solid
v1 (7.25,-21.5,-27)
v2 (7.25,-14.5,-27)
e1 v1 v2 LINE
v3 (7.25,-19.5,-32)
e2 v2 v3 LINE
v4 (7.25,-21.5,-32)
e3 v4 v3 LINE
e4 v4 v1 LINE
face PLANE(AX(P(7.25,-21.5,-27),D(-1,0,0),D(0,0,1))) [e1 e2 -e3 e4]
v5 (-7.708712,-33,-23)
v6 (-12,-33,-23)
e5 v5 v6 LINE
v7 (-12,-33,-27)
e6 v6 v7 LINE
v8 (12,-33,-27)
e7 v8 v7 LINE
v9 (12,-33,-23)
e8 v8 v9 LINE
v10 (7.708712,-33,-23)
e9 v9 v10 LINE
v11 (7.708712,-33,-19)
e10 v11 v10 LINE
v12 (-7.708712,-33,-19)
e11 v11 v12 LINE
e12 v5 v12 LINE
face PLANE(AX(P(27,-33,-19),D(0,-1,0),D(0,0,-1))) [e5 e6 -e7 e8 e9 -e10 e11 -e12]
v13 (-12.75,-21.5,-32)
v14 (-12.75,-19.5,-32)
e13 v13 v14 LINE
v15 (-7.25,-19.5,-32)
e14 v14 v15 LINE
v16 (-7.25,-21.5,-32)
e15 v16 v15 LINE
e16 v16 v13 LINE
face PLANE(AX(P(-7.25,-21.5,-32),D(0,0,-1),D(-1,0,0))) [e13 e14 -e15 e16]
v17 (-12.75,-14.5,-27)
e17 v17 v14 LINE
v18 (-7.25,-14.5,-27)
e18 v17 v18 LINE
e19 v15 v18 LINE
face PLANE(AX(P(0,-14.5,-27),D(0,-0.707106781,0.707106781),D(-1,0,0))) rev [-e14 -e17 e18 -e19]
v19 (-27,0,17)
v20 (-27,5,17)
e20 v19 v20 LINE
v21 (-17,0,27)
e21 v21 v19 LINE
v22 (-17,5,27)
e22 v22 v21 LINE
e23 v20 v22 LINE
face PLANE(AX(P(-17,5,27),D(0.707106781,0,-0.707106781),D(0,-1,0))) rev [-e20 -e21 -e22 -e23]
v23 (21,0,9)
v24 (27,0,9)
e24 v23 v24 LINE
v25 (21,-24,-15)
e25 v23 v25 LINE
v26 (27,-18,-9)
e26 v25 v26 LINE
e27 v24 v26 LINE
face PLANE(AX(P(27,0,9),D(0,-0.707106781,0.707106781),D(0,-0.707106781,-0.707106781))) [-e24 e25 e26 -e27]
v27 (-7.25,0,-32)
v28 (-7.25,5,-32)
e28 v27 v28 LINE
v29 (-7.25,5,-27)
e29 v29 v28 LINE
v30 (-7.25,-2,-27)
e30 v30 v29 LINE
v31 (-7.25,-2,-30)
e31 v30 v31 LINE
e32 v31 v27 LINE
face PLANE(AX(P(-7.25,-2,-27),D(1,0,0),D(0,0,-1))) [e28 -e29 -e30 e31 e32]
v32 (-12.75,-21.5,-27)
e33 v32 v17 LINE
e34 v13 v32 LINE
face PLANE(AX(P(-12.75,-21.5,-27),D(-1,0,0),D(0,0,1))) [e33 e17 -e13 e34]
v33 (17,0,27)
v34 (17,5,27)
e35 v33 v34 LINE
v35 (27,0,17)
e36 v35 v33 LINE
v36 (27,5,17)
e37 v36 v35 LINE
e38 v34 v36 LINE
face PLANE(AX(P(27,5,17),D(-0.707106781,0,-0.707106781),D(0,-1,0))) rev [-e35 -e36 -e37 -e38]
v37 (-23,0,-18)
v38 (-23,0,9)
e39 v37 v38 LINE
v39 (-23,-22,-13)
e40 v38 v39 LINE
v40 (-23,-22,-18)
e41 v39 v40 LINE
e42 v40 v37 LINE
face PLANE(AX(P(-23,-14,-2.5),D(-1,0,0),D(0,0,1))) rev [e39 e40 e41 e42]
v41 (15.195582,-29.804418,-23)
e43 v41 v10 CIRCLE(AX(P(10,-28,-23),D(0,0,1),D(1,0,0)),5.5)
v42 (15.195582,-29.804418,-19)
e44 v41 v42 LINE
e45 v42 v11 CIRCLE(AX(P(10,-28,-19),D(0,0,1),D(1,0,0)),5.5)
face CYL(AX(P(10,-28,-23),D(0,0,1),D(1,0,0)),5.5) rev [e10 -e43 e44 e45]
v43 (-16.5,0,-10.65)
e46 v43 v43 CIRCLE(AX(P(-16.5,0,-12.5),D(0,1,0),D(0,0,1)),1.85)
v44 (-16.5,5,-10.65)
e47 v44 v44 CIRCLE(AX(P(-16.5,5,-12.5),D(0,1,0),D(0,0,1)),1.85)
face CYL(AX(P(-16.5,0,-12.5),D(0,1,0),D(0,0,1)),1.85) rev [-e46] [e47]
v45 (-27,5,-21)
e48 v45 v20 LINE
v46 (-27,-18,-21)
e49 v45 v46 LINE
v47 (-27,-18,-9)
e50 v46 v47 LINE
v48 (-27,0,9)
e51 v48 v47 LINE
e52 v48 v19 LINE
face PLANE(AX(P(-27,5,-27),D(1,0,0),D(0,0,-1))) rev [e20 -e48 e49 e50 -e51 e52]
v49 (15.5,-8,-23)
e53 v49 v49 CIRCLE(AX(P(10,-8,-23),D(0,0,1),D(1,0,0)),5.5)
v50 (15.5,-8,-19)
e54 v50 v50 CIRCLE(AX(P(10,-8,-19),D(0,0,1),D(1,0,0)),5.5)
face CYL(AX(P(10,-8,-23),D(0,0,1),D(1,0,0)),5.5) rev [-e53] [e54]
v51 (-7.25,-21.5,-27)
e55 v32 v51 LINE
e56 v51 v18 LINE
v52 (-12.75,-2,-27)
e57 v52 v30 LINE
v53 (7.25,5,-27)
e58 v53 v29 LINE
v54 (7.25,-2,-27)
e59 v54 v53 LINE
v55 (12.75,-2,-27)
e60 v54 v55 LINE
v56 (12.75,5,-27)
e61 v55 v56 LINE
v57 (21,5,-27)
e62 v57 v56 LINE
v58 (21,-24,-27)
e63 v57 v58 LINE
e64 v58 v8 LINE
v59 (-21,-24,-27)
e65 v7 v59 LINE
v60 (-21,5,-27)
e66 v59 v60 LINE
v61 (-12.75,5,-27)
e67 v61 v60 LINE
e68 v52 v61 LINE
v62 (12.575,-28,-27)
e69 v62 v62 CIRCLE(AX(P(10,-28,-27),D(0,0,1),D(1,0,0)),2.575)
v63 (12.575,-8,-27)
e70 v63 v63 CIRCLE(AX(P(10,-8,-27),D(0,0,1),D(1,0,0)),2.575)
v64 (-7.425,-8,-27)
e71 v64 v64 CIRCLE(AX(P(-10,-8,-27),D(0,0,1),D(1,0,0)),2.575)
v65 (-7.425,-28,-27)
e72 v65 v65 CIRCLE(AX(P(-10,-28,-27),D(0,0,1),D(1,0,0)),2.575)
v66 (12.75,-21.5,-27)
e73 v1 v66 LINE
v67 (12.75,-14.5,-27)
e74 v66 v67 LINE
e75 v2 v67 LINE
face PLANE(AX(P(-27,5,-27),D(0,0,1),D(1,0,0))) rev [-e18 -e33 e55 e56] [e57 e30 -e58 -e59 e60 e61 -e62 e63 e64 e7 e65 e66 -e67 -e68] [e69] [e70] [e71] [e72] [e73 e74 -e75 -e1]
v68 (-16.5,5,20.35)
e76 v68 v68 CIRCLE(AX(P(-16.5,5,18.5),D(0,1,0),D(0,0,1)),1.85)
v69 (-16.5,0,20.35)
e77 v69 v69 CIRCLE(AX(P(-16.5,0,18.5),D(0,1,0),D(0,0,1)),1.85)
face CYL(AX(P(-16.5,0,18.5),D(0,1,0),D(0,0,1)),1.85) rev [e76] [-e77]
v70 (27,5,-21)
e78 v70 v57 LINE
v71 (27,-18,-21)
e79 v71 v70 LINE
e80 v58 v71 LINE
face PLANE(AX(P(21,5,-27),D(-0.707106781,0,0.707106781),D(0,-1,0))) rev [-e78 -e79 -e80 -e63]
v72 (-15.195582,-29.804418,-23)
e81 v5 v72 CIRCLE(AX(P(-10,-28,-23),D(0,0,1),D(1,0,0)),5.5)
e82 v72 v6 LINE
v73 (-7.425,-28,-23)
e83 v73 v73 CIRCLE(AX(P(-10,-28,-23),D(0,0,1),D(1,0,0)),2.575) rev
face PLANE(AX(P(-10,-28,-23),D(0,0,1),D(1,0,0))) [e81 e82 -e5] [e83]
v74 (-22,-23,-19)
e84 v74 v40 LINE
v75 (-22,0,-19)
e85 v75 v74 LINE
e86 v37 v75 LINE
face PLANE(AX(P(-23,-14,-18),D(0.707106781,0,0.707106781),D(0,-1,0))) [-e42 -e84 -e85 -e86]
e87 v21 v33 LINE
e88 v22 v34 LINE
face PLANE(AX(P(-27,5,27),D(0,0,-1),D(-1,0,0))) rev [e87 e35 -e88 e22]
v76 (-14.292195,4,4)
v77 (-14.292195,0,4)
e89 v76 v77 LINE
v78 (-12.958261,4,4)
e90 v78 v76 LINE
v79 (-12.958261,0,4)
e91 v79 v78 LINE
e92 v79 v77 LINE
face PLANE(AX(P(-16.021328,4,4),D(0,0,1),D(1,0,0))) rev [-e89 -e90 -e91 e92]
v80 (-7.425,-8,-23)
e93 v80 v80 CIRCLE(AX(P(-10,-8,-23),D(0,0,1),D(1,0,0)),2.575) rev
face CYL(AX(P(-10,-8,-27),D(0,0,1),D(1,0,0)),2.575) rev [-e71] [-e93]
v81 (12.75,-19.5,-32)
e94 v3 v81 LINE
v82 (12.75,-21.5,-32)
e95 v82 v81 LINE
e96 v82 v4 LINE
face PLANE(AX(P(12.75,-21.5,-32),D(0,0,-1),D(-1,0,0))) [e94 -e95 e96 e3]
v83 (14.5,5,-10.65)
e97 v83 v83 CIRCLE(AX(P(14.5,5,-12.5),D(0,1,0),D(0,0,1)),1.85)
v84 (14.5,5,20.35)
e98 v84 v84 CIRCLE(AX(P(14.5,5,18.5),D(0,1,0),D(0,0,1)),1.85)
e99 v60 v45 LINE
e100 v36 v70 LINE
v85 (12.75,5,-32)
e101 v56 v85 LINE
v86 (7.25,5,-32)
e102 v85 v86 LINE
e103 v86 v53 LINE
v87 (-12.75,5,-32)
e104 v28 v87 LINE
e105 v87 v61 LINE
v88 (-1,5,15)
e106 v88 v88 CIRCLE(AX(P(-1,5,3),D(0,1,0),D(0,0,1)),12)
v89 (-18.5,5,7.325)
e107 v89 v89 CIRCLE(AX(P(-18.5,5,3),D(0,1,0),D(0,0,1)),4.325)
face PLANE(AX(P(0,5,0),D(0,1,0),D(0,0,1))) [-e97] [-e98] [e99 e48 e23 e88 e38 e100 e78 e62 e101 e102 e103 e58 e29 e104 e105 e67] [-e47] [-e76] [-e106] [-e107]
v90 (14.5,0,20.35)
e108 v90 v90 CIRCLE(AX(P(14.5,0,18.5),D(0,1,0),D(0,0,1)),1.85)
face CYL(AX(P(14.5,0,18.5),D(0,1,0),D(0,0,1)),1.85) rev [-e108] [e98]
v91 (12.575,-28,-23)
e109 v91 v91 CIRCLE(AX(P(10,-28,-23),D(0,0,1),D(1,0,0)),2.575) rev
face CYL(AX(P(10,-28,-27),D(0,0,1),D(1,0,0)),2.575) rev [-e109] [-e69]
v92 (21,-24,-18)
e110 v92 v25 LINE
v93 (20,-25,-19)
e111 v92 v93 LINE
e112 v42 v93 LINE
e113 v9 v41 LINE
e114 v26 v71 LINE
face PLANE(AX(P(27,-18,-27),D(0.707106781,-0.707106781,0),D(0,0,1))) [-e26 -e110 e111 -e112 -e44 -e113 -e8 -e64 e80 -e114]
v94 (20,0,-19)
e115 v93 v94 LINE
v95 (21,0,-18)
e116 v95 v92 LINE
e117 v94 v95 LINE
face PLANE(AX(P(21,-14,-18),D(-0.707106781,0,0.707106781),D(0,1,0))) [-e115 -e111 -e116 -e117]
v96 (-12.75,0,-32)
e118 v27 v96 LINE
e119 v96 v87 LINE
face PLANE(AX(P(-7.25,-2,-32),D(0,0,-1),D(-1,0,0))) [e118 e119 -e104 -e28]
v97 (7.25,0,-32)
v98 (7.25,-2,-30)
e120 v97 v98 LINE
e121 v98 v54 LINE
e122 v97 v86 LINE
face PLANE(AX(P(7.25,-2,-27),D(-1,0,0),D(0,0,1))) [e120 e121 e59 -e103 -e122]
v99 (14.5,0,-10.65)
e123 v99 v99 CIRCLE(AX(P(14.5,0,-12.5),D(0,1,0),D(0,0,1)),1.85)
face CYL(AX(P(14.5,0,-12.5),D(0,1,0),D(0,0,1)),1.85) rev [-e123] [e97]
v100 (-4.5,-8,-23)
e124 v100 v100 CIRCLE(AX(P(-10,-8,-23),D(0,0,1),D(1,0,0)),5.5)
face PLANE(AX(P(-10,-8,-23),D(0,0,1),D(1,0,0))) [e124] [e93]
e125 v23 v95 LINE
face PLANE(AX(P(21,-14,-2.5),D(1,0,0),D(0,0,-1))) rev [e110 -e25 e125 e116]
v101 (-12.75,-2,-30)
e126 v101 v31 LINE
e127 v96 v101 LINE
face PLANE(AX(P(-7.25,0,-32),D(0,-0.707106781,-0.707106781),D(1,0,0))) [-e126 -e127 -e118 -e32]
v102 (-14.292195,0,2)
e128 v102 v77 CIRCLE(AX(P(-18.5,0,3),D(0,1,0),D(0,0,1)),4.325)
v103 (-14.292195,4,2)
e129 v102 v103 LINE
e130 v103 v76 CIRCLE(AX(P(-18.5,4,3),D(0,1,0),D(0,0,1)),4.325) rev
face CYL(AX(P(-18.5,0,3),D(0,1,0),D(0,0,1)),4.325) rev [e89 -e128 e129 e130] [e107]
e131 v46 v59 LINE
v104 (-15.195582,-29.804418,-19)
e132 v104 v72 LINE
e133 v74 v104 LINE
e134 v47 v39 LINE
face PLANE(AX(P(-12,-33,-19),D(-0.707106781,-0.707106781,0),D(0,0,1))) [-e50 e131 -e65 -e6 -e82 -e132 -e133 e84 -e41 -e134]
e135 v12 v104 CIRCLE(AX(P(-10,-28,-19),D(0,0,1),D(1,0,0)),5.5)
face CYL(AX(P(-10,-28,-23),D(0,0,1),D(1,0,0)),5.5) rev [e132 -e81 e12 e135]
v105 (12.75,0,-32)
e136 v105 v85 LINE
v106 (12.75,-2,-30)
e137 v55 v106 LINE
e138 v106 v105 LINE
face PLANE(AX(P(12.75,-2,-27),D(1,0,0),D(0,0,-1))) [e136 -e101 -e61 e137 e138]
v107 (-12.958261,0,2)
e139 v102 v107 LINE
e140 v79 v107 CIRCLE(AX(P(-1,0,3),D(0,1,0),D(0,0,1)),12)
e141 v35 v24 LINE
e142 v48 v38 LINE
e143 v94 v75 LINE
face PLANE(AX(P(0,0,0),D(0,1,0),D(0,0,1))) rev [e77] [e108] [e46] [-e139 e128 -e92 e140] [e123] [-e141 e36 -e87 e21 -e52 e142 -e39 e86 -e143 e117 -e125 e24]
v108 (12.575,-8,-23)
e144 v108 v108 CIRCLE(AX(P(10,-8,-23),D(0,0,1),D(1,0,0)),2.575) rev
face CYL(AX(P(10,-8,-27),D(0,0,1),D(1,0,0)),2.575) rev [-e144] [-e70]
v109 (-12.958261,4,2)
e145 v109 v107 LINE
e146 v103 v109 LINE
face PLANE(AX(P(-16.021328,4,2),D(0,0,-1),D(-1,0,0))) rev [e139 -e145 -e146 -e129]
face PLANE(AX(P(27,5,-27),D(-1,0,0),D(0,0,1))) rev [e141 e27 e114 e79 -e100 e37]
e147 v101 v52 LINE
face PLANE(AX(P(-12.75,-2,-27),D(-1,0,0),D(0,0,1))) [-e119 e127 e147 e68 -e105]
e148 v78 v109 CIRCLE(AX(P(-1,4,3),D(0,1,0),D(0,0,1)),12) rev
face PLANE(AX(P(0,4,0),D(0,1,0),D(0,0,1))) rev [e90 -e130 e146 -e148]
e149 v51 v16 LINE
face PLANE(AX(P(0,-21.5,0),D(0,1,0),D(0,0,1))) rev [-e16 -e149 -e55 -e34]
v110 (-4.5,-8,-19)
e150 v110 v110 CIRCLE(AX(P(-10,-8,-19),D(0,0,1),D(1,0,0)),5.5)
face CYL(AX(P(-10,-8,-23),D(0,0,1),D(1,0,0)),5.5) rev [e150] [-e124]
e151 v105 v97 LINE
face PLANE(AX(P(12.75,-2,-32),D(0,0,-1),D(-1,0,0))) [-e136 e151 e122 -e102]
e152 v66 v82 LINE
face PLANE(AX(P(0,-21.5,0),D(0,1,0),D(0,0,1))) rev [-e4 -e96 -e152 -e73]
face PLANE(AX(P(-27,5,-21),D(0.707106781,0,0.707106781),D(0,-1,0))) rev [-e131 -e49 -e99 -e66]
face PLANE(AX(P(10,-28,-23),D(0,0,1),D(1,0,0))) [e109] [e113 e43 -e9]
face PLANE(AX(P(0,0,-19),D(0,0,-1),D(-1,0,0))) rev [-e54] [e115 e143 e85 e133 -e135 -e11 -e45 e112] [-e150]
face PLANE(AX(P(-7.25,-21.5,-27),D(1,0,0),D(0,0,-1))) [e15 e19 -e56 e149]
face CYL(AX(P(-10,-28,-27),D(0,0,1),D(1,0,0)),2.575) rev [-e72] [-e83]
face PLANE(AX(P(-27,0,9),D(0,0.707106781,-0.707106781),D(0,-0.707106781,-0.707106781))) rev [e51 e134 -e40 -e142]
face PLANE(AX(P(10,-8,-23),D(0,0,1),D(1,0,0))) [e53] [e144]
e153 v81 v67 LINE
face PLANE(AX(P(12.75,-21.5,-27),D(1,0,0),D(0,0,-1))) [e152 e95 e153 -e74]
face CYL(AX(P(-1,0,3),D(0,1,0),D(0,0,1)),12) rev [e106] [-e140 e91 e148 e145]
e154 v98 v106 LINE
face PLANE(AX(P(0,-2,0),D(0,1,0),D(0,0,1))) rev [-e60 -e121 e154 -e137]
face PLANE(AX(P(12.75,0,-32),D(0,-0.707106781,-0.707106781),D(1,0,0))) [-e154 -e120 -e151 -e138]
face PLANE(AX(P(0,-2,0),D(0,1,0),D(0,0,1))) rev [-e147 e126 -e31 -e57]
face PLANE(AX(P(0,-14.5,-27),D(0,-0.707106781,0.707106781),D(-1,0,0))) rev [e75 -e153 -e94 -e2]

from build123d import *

# Parameters (mm, degrees)
SKETCH1_W           = 54
SKETCH1_H           = 54
BOSS_EXTRUDE1_DEPTH = 5
SKETCH3_W           = 54
SKETCH3_H           = 38
BOSS_EXTRUDE2_DEPTH = 8
SKETCH9_W           = 5.5
SKETCH9_H           = 5
BOSS_EXTRUDE3_DEPTH = 7
SKETCH2_R           = 12
SKETCH2_R_2         = 4.325
SKETCH2_R_3         = 1.85
CUT_EXTRUDE1_DEPTH  = 5
SKETCH4_R           = 2.575
CUT_EXTRUDE2_DEPTH  = 8
SKETCH7_R           = 5.5
CUT_EXTRUDE3_DEPTH  = 4
SKETCH8_W           = 4.486421388
SKETCH8_H           = 2
CUT_EXTRUDE4_DEPTH  = 4
RIB1_REACH          = 72.915
SKETCH5_WALL_W      = 183.428864958
SKETCH5_WALL_H      = 4
RIB9_REACH          = 72.915
SKETCH6_WALL_W      = 183.428864958
SKETCH6_WALL_H      = 6
CHAMFER1_SIZE       = 10
CHAMFER2_SIZE       = 15
CHAMFER3_SIZE       = 15
CHAMFER4_SIZE       = 1
CHAMFER6_SIZE       = 6
LPATTERN2_COUNT     = 2
LPATTERN2_PITCH     = 19.5
CHAMFER7_SIZE       = 2
CHAMFER8_SIZE       = 5


# Some blends are built 0.0001 mm under size
with BuildPart() as part:
    # Sketch1 → Boss-Extrude1 (new body)
    with BuildSketch(Plane(origin=(0, 0, 0), x_dir=(1, 0, 0), z_dir=(0, 1, 0))):
        Rectangle(SKETCH1_W, SKETCH1_H)
    extrude(amount=BOSS_EXTRUDE1_DEPTH)

    # Sketch3 → Boss-Extrude2 (add)
    with BuildSketch(Plane(origin=(0, 0, -27), x_dir=(-1, 0, 0), z_dir=(0, 0, -1))):
        with Locations((0, -14)):
            Rectangle(SKETCH3_W, SKETCH3_H)
    extrude(amount=-BOSS_EXTRUDE2_DEPTH)

    # Sketch9 → Boss-Extrude3 (add)
    with BuildSketch(Plane(origin=(0, 5, 0), x_dir=(1, 0, 0), z_dir=(0, 1, 0))):
        with Locations((10, 29.5)):
            Rectangle(SKETCH9_W, SKETCH9_H)
        with Locations((-10, 29.5)):
            Rectangle(SKETCH9_W, SKETCH9_H)
    boss_extrude3 = extrude(amount=-BOSS_EXTRUDE3_DEPTH)

    # Sketch2 → Cut-Extrude1 (cut)
    with BuildSketch(Plane(origin=(0, 5, 0), x_dir=(1, 0, 0), z_dir=(0, 1, 0))):
        with Locations(Location((-1, -3, 0), (0, 0, 270))):
            Circle(SKETCH2_R)
        with Locations(Location((-18.5, -3, 0), (0, 0, 270))):
            Circle(SKETCH2_R_2)
        with Locations(Location((14.5, 12.5, 0), (0, 0, 270))):
            Circle(SKETCH2_R_3)
        with Locations(Location((-16.5, 12.5, 0), (0, 0, 270))):
            Circle(SKETCH2_R_3)
        with Locations(Location((-16.5, -18.5, 0), (0, 0, 270))):
            Circle(SKETCH2_R_3)
        with Locations(Location((14.5, -18.5, 0), (0, 0, 270))):
            Circle(SKETCH2_R_3)
    extrude(amount=-CUT_EXTRUDE1_DEPTH, mode=Mode.SUBTRACT)

    # Sketch4 → Cut-Extrude2 (cut)
    with BuildSketch(Plane.XY.offset(-19)):
        with Locations((-10, -8)):
            Circle(SKETCH4_R)
        with Locations((10, -8)):
            Circle(SKETCH4_R)
        with Locations((10, -28)):
            Circle(SKETCH4_R)
        with Locations((-10, -28)):
            Circle(SKETCH4_R)
    extrude(amount=-CUT_EXTRUDE2_DEPTH, mode=Mode.SUBTRACT)

    # Sketch7 → Cut-Extrude3 (cut)
    with BuildSketch(Plane.XY.offset(-19)):
        with Locations((-10, -8)):
            Circle(SKETCH7_R)
        with Locations((10, -8)):
            Circle(SKETCH7_R)
        with Locations((10, -28)):
            Circle(SKETCH7_R)
        with Locations((-10, -28)):
            Circle(SKETCH7_R)
    extrude(amount=-CUT_EXTRUDE3_DEPTH, mode=Mode.SUBTRACT)

    # Sketch8 → Cut-Extrude4 (cut)
    with BuildSketch(Plane.XZ):
        with Locations((-13.778117046, 3)):
            Rectangle(SKETCH8_W, SKETCH8_H)
    extrude(amount=-CUT_EXTRUDE4_DEPTH, mode=Mode.SUBTRACT)

    # Sketch5 wall → Rib1 (add, up to next)
    with BuildSketch(Plane(origin=(-27, -14, -5), x_dir=(0, -0.707106781187, -0.707106781187), z_dir=(0, -0.707106781187, 0.707106781187)), mode=Mode.PRIVATE) as rib1_sk1:
        with Locations((0, 2)):
            Rectangle(SKETCH5_WALL_W, SKETCH5_WALL_H)
    rib1_tool1 = extrude(rib1_sk1.sketch, amount=-RIB1_REACH, mode=Mode.PRIVATE) - part.part
    add(rib1_tool1.solids().sort_by_distance((-27, -14, -5))[0])

    # Sketch6 wall → Rib9 (add, up to next)
    with BuildSketch(Plane(origin=(27, -14, -5), x_dir=(0, -0.707106781187, -0.707106781187), z_dir=(0, 0.707106781187, -0.707106781187)), mode=Mode.PRIVATE) as rib9_sk1:
        with Locations((0, 3)):
            Rectangle(SKETCH6_WALL_W, SKETCH6_WALL_H)
    rib9_tool1 = extrude(rib9_sk1.sketch, amount=RIB9_REACH, mode=Mode.PRIVATE) - part.part
    add(rib9_tool1.solids().sort_by_distance((27, -14, -5))[0])

    # Chamfer1
    chamfer1_edges = [part.edges().sort_by_distance(p)[0] for p in [
        (27, 2.5, 27),
        (-27, 2.5, 27),
    ]]
    chamfer(chamfer1_edges, length=CHAMFER1_SIZE)

    # Chamfer2
    # the kernel refuses this chamfer: 15 mm, written as the material it takes off along each edge
    with BuildSketch(Plane(origin=(27, -33, -65.575244819), x_dir=(-0.9996219169112968, -0.02749587661058632, 0), z_dir=(0, 0, 1))) as chamfer2_piece_1:
        Polygon((CHAMFER2_SIZE * 0.999621916911, -CHAMFER2_SIZE * 0.0274958766106), (-CHAMFER2_SIZE * 0.0274958766106, -CHAMFER2_SIZE * 0.999621916911), (0, 0), align=None)
    extrude(amount=85.150489639, mode=Mode.SUBTRACT)

    # Chamfer3
    # the kernel refuses this chamfer: 15 mm, written as the material it takes off along each edge
    with BuildSketch(Plane(origin=(-27, -33, -65.575244819), x_dir=(-0.02749587661058632, 0.9996219169112968, 0), z_dir=(0, 0, 1))) as chamfer3_piece_1:
        Polygon((CHAMFER3_SIZE * 0.999621916911, -CHAMFER3_SIZE * 0.0274958766106), (-CHAMFER3_SIZE * 0.0274958766106, -CHAMFER3_SIZE * 0.999621916911), (0, 0), align=None)
    extrude(amount=85.150489639, mode=Mode.SUBTRACT)

    # Chamfer4
    chamfer4_edges = [part.edges().sort_by_distance(p)[0] for p in [
        (21, -12, -19),
        (-23, -11, -19),
    ]]
    chamfer(chamfer4_edges, length=CHAMFER4_SIZE)

    # Chamfer6
    chamfer6_edges = [part.edges().sort_by_distance(p)[0] for p in [
        (-27, -6.5, -27),
        (27, -6.5, -27),
    ]]
    chamfer(chamfer6_edges, length=CHAMFER6_SIZE)

    # LPattern2: Boss-Extrude3 ×2
    with Locations(*[(0, -i * LPATTERN2_PITCH, 0) for i in range(1, LPATTERN2_COUNT)]):
        add(boss_extrude3)

    # Chamfer7
    chamfer7_edges = [part.edges().sort_by_distance(p)[0] for p in [
        (10, -2, -32),
        (-10, -2, -32),
    ]]
    chamfer(chamfer7_edges, length=CHAMFER7_SIZE)

    # Chamfer8
    chamfer8_edges = [part.edges().sort_by_distance(p)[0] for p in [
        (10, -14.5, -32),
        (-10, -14.5, -32),
    ]]
    chamfer(chamfer8_edges, length=CHAMFER8_SIZE - 0.0001)  # a hair under: the kernel refuses the full size


solid = part.part
